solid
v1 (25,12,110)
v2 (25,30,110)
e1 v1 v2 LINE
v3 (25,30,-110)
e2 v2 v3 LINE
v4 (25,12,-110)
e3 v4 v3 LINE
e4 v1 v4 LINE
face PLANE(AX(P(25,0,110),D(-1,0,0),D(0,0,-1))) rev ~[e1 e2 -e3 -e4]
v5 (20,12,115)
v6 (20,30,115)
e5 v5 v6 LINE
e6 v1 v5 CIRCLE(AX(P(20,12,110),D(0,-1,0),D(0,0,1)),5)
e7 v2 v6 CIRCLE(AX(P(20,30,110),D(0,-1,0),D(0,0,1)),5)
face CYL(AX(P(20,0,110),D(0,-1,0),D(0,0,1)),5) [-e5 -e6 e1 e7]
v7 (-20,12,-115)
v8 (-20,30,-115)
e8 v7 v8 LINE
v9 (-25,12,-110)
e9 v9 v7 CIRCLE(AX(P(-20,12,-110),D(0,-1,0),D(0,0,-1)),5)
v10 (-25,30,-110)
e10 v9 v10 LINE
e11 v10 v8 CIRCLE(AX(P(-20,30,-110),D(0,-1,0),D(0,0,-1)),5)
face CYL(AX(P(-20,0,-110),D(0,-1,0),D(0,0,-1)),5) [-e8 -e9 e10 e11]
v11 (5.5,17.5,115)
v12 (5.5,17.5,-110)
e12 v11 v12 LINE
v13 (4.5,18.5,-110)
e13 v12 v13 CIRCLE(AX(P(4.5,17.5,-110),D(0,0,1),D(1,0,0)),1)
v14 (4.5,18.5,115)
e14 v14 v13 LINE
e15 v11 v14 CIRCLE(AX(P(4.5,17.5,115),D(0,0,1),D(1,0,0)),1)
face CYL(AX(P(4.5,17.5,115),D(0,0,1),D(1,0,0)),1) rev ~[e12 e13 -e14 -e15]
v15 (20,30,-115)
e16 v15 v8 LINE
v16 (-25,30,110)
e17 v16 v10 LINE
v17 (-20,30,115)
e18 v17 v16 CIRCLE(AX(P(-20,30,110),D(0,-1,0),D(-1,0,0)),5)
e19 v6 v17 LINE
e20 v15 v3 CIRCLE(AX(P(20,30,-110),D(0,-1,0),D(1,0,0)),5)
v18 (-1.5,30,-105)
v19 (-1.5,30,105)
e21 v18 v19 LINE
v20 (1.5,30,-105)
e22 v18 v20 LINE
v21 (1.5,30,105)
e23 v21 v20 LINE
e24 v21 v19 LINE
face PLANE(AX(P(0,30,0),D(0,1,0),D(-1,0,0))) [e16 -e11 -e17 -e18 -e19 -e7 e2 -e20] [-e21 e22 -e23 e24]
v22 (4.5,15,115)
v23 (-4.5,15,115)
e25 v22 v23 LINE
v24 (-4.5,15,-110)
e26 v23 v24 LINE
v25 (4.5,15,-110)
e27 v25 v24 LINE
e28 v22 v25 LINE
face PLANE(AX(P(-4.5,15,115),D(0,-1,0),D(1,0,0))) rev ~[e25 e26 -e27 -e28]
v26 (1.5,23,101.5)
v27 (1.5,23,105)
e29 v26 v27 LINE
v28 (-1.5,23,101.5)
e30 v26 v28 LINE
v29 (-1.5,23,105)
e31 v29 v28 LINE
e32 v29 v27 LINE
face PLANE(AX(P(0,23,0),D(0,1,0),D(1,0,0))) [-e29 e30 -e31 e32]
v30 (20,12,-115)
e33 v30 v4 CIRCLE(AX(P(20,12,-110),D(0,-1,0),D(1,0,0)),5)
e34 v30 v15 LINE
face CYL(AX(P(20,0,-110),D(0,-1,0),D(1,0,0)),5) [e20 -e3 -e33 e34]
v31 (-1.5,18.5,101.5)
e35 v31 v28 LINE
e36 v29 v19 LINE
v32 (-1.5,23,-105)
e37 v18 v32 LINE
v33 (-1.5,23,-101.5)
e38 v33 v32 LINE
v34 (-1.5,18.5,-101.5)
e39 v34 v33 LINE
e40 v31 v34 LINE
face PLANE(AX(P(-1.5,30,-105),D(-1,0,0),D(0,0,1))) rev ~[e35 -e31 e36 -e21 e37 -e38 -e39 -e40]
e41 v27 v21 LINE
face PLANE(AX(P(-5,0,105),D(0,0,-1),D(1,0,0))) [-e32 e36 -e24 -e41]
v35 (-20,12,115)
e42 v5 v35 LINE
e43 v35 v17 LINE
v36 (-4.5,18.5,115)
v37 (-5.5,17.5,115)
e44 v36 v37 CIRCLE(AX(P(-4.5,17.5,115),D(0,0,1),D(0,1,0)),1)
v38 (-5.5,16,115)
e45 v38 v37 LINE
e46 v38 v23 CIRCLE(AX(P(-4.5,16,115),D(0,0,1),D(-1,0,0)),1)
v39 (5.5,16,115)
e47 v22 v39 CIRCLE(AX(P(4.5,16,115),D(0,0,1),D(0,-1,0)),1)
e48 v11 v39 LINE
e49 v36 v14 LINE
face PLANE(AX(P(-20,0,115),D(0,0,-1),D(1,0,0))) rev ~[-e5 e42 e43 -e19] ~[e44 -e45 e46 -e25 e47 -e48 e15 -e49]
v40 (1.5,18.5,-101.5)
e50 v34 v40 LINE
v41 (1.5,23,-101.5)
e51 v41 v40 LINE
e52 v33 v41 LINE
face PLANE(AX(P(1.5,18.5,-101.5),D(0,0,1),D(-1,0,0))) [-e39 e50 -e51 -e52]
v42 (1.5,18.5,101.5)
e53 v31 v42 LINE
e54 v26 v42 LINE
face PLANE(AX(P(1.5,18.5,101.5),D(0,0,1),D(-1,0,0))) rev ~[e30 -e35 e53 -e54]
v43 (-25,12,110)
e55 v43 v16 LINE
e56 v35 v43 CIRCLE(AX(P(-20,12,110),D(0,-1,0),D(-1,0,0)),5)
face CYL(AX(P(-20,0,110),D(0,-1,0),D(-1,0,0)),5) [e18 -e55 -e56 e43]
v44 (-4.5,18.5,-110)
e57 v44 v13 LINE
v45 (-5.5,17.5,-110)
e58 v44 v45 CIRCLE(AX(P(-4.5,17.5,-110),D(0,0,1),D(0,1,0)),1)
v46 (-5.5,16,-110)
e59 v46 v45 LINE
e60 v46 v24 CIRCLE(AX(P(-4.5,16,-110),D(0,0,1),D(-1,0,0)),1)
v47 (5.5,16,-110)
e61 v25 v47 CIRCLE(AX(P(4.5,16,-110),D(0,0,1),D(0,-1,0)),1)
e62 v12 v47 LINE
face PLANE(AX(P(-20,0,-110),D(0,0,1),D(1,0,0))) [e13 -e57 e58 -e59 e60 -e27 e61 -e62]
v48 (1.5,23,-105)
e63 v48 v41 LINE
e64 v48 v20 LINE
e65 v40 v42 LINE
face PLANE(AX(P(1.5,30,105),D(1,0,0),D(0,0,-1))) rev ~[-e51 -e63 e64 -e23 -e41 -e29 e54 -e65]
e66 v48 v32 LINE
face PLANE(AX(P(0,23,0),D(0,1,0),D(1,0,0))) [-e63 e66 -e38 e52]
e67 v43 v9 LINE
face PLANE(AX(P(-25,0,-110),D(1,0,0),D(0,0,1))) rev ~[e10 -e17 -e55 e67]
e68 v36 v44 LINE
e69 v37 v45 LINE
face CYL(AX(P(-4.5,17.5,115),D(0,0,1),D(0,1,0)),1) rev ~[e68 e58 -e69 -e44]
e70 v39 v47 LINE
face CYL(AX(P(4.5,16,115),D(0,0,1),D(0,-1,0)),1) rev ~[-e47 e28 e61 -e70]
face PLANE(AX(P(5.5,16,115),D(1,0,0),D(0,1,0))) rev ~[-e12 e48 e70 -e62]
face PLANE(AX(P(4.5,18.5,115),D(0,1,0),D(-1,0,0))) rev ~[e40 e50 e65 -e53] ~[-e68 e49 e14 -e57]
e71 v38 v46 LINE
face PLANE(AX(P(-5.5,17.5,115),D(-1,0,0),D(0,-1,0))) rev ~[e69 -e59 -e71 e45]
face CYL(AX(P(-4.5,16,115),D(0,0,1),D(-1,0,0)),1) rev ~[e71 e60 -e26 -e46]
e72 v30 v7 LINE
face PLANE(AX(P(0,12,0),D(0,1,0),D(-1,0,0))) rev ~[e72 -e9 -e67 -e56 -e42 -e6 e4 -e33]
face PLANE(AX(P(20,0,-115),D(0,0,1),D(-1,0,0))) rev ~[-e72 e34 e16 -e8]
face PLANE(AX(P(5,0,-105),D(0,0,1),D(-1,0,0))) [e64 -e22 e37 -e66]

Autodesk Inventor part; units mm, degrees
ref_plane "YZ Plane" through (0, 0, 0) normal (1, 0, 0) x (0, 1, 0)
ref_plane "XZ Plane" through (0, 0, 0) normal (0, 1, 0) x (-1, 0, 0)
ref_plane "XY Plane" through (0, 0, 0) normal (0, 0, 1) x (1, 0, 0)
sketch "Sketch1" plane through (0, 0, 0) normal (0, 1, 0) x (-1, 0, 0)
  line L0 (-20, -115) -> (20, -115)
  line L1 (25, -110) -> (25, 110)
  line L2 (20, 115) -> (-20, 115)
  line L3 (-25, 110) -> (-25, -110)
  line L4 (-5, -105) -> (5, -105)
  line L5 (5, -105) -> (5, 105)
  line L6 (5, 105) -> (-5, 105)
  line L7 (-5, 105) -> (-5, -105)
  arc A0 (25, 110) -> (20, 115) centre (20, 110) ccw
  arc A1 (-20, 115) -> (-25, 110) centre (-20, 110) ccw
  arc A2 (-25, -110) -> (-20, -115) centre (-20, -110) ccw
  arc A3 (20, -115) -> (25, -110) centre (20, -110) ccw
  line L8 (-1.5, -105) -> (1.5, -105)
  line L9 (1.5, 105) -> (-1.5, 105)
  point P0 (0, 0)
  point P1 (0, 0)
  dimension "d6" = 10
  dimension "d7" = 210
  dimension "d8" = 5
  dimension "d9" = 3
  dimension "d10" = 210
extrude "Extrusion1" add sketch "Sketch1" along normal blind 30
extrude "Extrusion2" add sketch "Sketch1" along normal blind 15 contours L7 L6 L5 L4
sketch "Sketch2" plane through (0, 30, 0) normal (0, 1, 0) x (1, 0, 0)
  line L0 (-1.5, -105) -> (1.5, -105)
  line L1 (1.5, -105) -> (1.5, 105)
  line L2 (1.5, 105) -> (-1.5, 105)
  line L3 (-1.5, 105) -> (-1.5, -105)
  line L4 (-1.5, -105) -> (1.5, 105) construction
  line L5 (1.5, -105) -> (-1.5, 105) construction
  line L6 (5, 105) -> (5, -105) projected
  line L7 (5, 105) -> (1.5, 105)
  line L8 (1.5, 105) -> (1.5, -105)
  line L9 (1.5, -105) -> (5, -105)
  line L10 (5, -105) -> (5, 105)
  line L11 (-5, 105) -> (5, 105) projected
  line L12 (-5, 105) -> (-1.5, 105)
  line L13 (-1.5, 105) -> (-1.5, -105)
  line L14 (-1.5, -105) -> (-5, -105)
  line L15 (-5, -105) -> (-5, 105)
  point P0 (0, 0)
  dimension "d15" = 3
  dimension "d16" = 210
extrude "Extrusion3" add sketch "Sketch2" against normal blind 15 contours L14 L15 L11 L3 | L1 L7 L6 L9
sketch "Sketch5" plane through (-20, 0, 115) normal (0, 0, 1) x (1, 0, 0)
  line L0 (15.5, 15) -> (24.5, 15)
  line L1 (25.5, 16) -> (25.5, 17.5)
  line L2 (24.5, 18.5) -> (15.5, 18.5)
  line L3 (14.5, 17.5) -> (14.5, 16)
  arc A0 (15.5, 18.5) -> (14.5, 17.5) centre (15.5, 17.5) ccw
  arc A1 (14.5, 16) -> (15.5, 15) centre (15.5, 16) ccw
  arc A2 (24.5, 15) -> (25.5, 16) centre (24.5, 16) ccw
  arc A3 (25.5, 17.5) -> (24.5, 18.5) centre (24.5, 17.5) ccw
  line L4 (-5, 0) -> (-5, 30) projected
  point P0 (20, 0)
  point P1 (14.5, 15)
  point P2 (25.5, 18.5)
  point P3 (25.5, 15)
  point P4 (14.5, 18.5)
  point P5 (14.5, 16.75)
  dimension "d23" = 11
  dimension "d24" = 3.5
  dimension "d27" = 1
  dimension "d38" = 19.5
extrude "Extrusion4" cut sketch "Sketch5" against normal blind 225
ref_plane "Work Plane1" through (0, 18.5, 0) normal (0, 1, 0) x (1, 0, 0)
sketch "Sketch6" plane through (0, 18.5, 0) normal (0, 1, 0) x (1, 0, 0)
  line L0 (-1.5, -105) -> (1.5, -105)
  line L1 (1.5, -105) -> (1.5, -101.5)
  line L2 (1.5, -101.5) -> (-1.5, -101.5)
  line L3 (-1.5, -101.5) -> (-1.5, -105)
  line L4 (0, 0) -> (38.1374, 0)
  line L5 (-1.5, 105) -> (1.5, 105)
  line L6 (1.5, 105) -> (1.5, 101.5)
  line L7 (1.5, 101.5) -> (-1.5, 101.5)
  line L8 (-1.5, 101.5) -> (-1.5, 105)
  dimension "d31" = 3.5
extrude "Extrusion5" add sketch "Sketch6" along normal blind 4.5
ref_plane "Work Plane2" through (0, 12.5, 0) normal (0, 1, 0) x (1, 0, 0)
move faces "Move1" translate (0, 12, 0) faces at (8.3333, 0, 36.6667)
properties part number "acrylic_base"
